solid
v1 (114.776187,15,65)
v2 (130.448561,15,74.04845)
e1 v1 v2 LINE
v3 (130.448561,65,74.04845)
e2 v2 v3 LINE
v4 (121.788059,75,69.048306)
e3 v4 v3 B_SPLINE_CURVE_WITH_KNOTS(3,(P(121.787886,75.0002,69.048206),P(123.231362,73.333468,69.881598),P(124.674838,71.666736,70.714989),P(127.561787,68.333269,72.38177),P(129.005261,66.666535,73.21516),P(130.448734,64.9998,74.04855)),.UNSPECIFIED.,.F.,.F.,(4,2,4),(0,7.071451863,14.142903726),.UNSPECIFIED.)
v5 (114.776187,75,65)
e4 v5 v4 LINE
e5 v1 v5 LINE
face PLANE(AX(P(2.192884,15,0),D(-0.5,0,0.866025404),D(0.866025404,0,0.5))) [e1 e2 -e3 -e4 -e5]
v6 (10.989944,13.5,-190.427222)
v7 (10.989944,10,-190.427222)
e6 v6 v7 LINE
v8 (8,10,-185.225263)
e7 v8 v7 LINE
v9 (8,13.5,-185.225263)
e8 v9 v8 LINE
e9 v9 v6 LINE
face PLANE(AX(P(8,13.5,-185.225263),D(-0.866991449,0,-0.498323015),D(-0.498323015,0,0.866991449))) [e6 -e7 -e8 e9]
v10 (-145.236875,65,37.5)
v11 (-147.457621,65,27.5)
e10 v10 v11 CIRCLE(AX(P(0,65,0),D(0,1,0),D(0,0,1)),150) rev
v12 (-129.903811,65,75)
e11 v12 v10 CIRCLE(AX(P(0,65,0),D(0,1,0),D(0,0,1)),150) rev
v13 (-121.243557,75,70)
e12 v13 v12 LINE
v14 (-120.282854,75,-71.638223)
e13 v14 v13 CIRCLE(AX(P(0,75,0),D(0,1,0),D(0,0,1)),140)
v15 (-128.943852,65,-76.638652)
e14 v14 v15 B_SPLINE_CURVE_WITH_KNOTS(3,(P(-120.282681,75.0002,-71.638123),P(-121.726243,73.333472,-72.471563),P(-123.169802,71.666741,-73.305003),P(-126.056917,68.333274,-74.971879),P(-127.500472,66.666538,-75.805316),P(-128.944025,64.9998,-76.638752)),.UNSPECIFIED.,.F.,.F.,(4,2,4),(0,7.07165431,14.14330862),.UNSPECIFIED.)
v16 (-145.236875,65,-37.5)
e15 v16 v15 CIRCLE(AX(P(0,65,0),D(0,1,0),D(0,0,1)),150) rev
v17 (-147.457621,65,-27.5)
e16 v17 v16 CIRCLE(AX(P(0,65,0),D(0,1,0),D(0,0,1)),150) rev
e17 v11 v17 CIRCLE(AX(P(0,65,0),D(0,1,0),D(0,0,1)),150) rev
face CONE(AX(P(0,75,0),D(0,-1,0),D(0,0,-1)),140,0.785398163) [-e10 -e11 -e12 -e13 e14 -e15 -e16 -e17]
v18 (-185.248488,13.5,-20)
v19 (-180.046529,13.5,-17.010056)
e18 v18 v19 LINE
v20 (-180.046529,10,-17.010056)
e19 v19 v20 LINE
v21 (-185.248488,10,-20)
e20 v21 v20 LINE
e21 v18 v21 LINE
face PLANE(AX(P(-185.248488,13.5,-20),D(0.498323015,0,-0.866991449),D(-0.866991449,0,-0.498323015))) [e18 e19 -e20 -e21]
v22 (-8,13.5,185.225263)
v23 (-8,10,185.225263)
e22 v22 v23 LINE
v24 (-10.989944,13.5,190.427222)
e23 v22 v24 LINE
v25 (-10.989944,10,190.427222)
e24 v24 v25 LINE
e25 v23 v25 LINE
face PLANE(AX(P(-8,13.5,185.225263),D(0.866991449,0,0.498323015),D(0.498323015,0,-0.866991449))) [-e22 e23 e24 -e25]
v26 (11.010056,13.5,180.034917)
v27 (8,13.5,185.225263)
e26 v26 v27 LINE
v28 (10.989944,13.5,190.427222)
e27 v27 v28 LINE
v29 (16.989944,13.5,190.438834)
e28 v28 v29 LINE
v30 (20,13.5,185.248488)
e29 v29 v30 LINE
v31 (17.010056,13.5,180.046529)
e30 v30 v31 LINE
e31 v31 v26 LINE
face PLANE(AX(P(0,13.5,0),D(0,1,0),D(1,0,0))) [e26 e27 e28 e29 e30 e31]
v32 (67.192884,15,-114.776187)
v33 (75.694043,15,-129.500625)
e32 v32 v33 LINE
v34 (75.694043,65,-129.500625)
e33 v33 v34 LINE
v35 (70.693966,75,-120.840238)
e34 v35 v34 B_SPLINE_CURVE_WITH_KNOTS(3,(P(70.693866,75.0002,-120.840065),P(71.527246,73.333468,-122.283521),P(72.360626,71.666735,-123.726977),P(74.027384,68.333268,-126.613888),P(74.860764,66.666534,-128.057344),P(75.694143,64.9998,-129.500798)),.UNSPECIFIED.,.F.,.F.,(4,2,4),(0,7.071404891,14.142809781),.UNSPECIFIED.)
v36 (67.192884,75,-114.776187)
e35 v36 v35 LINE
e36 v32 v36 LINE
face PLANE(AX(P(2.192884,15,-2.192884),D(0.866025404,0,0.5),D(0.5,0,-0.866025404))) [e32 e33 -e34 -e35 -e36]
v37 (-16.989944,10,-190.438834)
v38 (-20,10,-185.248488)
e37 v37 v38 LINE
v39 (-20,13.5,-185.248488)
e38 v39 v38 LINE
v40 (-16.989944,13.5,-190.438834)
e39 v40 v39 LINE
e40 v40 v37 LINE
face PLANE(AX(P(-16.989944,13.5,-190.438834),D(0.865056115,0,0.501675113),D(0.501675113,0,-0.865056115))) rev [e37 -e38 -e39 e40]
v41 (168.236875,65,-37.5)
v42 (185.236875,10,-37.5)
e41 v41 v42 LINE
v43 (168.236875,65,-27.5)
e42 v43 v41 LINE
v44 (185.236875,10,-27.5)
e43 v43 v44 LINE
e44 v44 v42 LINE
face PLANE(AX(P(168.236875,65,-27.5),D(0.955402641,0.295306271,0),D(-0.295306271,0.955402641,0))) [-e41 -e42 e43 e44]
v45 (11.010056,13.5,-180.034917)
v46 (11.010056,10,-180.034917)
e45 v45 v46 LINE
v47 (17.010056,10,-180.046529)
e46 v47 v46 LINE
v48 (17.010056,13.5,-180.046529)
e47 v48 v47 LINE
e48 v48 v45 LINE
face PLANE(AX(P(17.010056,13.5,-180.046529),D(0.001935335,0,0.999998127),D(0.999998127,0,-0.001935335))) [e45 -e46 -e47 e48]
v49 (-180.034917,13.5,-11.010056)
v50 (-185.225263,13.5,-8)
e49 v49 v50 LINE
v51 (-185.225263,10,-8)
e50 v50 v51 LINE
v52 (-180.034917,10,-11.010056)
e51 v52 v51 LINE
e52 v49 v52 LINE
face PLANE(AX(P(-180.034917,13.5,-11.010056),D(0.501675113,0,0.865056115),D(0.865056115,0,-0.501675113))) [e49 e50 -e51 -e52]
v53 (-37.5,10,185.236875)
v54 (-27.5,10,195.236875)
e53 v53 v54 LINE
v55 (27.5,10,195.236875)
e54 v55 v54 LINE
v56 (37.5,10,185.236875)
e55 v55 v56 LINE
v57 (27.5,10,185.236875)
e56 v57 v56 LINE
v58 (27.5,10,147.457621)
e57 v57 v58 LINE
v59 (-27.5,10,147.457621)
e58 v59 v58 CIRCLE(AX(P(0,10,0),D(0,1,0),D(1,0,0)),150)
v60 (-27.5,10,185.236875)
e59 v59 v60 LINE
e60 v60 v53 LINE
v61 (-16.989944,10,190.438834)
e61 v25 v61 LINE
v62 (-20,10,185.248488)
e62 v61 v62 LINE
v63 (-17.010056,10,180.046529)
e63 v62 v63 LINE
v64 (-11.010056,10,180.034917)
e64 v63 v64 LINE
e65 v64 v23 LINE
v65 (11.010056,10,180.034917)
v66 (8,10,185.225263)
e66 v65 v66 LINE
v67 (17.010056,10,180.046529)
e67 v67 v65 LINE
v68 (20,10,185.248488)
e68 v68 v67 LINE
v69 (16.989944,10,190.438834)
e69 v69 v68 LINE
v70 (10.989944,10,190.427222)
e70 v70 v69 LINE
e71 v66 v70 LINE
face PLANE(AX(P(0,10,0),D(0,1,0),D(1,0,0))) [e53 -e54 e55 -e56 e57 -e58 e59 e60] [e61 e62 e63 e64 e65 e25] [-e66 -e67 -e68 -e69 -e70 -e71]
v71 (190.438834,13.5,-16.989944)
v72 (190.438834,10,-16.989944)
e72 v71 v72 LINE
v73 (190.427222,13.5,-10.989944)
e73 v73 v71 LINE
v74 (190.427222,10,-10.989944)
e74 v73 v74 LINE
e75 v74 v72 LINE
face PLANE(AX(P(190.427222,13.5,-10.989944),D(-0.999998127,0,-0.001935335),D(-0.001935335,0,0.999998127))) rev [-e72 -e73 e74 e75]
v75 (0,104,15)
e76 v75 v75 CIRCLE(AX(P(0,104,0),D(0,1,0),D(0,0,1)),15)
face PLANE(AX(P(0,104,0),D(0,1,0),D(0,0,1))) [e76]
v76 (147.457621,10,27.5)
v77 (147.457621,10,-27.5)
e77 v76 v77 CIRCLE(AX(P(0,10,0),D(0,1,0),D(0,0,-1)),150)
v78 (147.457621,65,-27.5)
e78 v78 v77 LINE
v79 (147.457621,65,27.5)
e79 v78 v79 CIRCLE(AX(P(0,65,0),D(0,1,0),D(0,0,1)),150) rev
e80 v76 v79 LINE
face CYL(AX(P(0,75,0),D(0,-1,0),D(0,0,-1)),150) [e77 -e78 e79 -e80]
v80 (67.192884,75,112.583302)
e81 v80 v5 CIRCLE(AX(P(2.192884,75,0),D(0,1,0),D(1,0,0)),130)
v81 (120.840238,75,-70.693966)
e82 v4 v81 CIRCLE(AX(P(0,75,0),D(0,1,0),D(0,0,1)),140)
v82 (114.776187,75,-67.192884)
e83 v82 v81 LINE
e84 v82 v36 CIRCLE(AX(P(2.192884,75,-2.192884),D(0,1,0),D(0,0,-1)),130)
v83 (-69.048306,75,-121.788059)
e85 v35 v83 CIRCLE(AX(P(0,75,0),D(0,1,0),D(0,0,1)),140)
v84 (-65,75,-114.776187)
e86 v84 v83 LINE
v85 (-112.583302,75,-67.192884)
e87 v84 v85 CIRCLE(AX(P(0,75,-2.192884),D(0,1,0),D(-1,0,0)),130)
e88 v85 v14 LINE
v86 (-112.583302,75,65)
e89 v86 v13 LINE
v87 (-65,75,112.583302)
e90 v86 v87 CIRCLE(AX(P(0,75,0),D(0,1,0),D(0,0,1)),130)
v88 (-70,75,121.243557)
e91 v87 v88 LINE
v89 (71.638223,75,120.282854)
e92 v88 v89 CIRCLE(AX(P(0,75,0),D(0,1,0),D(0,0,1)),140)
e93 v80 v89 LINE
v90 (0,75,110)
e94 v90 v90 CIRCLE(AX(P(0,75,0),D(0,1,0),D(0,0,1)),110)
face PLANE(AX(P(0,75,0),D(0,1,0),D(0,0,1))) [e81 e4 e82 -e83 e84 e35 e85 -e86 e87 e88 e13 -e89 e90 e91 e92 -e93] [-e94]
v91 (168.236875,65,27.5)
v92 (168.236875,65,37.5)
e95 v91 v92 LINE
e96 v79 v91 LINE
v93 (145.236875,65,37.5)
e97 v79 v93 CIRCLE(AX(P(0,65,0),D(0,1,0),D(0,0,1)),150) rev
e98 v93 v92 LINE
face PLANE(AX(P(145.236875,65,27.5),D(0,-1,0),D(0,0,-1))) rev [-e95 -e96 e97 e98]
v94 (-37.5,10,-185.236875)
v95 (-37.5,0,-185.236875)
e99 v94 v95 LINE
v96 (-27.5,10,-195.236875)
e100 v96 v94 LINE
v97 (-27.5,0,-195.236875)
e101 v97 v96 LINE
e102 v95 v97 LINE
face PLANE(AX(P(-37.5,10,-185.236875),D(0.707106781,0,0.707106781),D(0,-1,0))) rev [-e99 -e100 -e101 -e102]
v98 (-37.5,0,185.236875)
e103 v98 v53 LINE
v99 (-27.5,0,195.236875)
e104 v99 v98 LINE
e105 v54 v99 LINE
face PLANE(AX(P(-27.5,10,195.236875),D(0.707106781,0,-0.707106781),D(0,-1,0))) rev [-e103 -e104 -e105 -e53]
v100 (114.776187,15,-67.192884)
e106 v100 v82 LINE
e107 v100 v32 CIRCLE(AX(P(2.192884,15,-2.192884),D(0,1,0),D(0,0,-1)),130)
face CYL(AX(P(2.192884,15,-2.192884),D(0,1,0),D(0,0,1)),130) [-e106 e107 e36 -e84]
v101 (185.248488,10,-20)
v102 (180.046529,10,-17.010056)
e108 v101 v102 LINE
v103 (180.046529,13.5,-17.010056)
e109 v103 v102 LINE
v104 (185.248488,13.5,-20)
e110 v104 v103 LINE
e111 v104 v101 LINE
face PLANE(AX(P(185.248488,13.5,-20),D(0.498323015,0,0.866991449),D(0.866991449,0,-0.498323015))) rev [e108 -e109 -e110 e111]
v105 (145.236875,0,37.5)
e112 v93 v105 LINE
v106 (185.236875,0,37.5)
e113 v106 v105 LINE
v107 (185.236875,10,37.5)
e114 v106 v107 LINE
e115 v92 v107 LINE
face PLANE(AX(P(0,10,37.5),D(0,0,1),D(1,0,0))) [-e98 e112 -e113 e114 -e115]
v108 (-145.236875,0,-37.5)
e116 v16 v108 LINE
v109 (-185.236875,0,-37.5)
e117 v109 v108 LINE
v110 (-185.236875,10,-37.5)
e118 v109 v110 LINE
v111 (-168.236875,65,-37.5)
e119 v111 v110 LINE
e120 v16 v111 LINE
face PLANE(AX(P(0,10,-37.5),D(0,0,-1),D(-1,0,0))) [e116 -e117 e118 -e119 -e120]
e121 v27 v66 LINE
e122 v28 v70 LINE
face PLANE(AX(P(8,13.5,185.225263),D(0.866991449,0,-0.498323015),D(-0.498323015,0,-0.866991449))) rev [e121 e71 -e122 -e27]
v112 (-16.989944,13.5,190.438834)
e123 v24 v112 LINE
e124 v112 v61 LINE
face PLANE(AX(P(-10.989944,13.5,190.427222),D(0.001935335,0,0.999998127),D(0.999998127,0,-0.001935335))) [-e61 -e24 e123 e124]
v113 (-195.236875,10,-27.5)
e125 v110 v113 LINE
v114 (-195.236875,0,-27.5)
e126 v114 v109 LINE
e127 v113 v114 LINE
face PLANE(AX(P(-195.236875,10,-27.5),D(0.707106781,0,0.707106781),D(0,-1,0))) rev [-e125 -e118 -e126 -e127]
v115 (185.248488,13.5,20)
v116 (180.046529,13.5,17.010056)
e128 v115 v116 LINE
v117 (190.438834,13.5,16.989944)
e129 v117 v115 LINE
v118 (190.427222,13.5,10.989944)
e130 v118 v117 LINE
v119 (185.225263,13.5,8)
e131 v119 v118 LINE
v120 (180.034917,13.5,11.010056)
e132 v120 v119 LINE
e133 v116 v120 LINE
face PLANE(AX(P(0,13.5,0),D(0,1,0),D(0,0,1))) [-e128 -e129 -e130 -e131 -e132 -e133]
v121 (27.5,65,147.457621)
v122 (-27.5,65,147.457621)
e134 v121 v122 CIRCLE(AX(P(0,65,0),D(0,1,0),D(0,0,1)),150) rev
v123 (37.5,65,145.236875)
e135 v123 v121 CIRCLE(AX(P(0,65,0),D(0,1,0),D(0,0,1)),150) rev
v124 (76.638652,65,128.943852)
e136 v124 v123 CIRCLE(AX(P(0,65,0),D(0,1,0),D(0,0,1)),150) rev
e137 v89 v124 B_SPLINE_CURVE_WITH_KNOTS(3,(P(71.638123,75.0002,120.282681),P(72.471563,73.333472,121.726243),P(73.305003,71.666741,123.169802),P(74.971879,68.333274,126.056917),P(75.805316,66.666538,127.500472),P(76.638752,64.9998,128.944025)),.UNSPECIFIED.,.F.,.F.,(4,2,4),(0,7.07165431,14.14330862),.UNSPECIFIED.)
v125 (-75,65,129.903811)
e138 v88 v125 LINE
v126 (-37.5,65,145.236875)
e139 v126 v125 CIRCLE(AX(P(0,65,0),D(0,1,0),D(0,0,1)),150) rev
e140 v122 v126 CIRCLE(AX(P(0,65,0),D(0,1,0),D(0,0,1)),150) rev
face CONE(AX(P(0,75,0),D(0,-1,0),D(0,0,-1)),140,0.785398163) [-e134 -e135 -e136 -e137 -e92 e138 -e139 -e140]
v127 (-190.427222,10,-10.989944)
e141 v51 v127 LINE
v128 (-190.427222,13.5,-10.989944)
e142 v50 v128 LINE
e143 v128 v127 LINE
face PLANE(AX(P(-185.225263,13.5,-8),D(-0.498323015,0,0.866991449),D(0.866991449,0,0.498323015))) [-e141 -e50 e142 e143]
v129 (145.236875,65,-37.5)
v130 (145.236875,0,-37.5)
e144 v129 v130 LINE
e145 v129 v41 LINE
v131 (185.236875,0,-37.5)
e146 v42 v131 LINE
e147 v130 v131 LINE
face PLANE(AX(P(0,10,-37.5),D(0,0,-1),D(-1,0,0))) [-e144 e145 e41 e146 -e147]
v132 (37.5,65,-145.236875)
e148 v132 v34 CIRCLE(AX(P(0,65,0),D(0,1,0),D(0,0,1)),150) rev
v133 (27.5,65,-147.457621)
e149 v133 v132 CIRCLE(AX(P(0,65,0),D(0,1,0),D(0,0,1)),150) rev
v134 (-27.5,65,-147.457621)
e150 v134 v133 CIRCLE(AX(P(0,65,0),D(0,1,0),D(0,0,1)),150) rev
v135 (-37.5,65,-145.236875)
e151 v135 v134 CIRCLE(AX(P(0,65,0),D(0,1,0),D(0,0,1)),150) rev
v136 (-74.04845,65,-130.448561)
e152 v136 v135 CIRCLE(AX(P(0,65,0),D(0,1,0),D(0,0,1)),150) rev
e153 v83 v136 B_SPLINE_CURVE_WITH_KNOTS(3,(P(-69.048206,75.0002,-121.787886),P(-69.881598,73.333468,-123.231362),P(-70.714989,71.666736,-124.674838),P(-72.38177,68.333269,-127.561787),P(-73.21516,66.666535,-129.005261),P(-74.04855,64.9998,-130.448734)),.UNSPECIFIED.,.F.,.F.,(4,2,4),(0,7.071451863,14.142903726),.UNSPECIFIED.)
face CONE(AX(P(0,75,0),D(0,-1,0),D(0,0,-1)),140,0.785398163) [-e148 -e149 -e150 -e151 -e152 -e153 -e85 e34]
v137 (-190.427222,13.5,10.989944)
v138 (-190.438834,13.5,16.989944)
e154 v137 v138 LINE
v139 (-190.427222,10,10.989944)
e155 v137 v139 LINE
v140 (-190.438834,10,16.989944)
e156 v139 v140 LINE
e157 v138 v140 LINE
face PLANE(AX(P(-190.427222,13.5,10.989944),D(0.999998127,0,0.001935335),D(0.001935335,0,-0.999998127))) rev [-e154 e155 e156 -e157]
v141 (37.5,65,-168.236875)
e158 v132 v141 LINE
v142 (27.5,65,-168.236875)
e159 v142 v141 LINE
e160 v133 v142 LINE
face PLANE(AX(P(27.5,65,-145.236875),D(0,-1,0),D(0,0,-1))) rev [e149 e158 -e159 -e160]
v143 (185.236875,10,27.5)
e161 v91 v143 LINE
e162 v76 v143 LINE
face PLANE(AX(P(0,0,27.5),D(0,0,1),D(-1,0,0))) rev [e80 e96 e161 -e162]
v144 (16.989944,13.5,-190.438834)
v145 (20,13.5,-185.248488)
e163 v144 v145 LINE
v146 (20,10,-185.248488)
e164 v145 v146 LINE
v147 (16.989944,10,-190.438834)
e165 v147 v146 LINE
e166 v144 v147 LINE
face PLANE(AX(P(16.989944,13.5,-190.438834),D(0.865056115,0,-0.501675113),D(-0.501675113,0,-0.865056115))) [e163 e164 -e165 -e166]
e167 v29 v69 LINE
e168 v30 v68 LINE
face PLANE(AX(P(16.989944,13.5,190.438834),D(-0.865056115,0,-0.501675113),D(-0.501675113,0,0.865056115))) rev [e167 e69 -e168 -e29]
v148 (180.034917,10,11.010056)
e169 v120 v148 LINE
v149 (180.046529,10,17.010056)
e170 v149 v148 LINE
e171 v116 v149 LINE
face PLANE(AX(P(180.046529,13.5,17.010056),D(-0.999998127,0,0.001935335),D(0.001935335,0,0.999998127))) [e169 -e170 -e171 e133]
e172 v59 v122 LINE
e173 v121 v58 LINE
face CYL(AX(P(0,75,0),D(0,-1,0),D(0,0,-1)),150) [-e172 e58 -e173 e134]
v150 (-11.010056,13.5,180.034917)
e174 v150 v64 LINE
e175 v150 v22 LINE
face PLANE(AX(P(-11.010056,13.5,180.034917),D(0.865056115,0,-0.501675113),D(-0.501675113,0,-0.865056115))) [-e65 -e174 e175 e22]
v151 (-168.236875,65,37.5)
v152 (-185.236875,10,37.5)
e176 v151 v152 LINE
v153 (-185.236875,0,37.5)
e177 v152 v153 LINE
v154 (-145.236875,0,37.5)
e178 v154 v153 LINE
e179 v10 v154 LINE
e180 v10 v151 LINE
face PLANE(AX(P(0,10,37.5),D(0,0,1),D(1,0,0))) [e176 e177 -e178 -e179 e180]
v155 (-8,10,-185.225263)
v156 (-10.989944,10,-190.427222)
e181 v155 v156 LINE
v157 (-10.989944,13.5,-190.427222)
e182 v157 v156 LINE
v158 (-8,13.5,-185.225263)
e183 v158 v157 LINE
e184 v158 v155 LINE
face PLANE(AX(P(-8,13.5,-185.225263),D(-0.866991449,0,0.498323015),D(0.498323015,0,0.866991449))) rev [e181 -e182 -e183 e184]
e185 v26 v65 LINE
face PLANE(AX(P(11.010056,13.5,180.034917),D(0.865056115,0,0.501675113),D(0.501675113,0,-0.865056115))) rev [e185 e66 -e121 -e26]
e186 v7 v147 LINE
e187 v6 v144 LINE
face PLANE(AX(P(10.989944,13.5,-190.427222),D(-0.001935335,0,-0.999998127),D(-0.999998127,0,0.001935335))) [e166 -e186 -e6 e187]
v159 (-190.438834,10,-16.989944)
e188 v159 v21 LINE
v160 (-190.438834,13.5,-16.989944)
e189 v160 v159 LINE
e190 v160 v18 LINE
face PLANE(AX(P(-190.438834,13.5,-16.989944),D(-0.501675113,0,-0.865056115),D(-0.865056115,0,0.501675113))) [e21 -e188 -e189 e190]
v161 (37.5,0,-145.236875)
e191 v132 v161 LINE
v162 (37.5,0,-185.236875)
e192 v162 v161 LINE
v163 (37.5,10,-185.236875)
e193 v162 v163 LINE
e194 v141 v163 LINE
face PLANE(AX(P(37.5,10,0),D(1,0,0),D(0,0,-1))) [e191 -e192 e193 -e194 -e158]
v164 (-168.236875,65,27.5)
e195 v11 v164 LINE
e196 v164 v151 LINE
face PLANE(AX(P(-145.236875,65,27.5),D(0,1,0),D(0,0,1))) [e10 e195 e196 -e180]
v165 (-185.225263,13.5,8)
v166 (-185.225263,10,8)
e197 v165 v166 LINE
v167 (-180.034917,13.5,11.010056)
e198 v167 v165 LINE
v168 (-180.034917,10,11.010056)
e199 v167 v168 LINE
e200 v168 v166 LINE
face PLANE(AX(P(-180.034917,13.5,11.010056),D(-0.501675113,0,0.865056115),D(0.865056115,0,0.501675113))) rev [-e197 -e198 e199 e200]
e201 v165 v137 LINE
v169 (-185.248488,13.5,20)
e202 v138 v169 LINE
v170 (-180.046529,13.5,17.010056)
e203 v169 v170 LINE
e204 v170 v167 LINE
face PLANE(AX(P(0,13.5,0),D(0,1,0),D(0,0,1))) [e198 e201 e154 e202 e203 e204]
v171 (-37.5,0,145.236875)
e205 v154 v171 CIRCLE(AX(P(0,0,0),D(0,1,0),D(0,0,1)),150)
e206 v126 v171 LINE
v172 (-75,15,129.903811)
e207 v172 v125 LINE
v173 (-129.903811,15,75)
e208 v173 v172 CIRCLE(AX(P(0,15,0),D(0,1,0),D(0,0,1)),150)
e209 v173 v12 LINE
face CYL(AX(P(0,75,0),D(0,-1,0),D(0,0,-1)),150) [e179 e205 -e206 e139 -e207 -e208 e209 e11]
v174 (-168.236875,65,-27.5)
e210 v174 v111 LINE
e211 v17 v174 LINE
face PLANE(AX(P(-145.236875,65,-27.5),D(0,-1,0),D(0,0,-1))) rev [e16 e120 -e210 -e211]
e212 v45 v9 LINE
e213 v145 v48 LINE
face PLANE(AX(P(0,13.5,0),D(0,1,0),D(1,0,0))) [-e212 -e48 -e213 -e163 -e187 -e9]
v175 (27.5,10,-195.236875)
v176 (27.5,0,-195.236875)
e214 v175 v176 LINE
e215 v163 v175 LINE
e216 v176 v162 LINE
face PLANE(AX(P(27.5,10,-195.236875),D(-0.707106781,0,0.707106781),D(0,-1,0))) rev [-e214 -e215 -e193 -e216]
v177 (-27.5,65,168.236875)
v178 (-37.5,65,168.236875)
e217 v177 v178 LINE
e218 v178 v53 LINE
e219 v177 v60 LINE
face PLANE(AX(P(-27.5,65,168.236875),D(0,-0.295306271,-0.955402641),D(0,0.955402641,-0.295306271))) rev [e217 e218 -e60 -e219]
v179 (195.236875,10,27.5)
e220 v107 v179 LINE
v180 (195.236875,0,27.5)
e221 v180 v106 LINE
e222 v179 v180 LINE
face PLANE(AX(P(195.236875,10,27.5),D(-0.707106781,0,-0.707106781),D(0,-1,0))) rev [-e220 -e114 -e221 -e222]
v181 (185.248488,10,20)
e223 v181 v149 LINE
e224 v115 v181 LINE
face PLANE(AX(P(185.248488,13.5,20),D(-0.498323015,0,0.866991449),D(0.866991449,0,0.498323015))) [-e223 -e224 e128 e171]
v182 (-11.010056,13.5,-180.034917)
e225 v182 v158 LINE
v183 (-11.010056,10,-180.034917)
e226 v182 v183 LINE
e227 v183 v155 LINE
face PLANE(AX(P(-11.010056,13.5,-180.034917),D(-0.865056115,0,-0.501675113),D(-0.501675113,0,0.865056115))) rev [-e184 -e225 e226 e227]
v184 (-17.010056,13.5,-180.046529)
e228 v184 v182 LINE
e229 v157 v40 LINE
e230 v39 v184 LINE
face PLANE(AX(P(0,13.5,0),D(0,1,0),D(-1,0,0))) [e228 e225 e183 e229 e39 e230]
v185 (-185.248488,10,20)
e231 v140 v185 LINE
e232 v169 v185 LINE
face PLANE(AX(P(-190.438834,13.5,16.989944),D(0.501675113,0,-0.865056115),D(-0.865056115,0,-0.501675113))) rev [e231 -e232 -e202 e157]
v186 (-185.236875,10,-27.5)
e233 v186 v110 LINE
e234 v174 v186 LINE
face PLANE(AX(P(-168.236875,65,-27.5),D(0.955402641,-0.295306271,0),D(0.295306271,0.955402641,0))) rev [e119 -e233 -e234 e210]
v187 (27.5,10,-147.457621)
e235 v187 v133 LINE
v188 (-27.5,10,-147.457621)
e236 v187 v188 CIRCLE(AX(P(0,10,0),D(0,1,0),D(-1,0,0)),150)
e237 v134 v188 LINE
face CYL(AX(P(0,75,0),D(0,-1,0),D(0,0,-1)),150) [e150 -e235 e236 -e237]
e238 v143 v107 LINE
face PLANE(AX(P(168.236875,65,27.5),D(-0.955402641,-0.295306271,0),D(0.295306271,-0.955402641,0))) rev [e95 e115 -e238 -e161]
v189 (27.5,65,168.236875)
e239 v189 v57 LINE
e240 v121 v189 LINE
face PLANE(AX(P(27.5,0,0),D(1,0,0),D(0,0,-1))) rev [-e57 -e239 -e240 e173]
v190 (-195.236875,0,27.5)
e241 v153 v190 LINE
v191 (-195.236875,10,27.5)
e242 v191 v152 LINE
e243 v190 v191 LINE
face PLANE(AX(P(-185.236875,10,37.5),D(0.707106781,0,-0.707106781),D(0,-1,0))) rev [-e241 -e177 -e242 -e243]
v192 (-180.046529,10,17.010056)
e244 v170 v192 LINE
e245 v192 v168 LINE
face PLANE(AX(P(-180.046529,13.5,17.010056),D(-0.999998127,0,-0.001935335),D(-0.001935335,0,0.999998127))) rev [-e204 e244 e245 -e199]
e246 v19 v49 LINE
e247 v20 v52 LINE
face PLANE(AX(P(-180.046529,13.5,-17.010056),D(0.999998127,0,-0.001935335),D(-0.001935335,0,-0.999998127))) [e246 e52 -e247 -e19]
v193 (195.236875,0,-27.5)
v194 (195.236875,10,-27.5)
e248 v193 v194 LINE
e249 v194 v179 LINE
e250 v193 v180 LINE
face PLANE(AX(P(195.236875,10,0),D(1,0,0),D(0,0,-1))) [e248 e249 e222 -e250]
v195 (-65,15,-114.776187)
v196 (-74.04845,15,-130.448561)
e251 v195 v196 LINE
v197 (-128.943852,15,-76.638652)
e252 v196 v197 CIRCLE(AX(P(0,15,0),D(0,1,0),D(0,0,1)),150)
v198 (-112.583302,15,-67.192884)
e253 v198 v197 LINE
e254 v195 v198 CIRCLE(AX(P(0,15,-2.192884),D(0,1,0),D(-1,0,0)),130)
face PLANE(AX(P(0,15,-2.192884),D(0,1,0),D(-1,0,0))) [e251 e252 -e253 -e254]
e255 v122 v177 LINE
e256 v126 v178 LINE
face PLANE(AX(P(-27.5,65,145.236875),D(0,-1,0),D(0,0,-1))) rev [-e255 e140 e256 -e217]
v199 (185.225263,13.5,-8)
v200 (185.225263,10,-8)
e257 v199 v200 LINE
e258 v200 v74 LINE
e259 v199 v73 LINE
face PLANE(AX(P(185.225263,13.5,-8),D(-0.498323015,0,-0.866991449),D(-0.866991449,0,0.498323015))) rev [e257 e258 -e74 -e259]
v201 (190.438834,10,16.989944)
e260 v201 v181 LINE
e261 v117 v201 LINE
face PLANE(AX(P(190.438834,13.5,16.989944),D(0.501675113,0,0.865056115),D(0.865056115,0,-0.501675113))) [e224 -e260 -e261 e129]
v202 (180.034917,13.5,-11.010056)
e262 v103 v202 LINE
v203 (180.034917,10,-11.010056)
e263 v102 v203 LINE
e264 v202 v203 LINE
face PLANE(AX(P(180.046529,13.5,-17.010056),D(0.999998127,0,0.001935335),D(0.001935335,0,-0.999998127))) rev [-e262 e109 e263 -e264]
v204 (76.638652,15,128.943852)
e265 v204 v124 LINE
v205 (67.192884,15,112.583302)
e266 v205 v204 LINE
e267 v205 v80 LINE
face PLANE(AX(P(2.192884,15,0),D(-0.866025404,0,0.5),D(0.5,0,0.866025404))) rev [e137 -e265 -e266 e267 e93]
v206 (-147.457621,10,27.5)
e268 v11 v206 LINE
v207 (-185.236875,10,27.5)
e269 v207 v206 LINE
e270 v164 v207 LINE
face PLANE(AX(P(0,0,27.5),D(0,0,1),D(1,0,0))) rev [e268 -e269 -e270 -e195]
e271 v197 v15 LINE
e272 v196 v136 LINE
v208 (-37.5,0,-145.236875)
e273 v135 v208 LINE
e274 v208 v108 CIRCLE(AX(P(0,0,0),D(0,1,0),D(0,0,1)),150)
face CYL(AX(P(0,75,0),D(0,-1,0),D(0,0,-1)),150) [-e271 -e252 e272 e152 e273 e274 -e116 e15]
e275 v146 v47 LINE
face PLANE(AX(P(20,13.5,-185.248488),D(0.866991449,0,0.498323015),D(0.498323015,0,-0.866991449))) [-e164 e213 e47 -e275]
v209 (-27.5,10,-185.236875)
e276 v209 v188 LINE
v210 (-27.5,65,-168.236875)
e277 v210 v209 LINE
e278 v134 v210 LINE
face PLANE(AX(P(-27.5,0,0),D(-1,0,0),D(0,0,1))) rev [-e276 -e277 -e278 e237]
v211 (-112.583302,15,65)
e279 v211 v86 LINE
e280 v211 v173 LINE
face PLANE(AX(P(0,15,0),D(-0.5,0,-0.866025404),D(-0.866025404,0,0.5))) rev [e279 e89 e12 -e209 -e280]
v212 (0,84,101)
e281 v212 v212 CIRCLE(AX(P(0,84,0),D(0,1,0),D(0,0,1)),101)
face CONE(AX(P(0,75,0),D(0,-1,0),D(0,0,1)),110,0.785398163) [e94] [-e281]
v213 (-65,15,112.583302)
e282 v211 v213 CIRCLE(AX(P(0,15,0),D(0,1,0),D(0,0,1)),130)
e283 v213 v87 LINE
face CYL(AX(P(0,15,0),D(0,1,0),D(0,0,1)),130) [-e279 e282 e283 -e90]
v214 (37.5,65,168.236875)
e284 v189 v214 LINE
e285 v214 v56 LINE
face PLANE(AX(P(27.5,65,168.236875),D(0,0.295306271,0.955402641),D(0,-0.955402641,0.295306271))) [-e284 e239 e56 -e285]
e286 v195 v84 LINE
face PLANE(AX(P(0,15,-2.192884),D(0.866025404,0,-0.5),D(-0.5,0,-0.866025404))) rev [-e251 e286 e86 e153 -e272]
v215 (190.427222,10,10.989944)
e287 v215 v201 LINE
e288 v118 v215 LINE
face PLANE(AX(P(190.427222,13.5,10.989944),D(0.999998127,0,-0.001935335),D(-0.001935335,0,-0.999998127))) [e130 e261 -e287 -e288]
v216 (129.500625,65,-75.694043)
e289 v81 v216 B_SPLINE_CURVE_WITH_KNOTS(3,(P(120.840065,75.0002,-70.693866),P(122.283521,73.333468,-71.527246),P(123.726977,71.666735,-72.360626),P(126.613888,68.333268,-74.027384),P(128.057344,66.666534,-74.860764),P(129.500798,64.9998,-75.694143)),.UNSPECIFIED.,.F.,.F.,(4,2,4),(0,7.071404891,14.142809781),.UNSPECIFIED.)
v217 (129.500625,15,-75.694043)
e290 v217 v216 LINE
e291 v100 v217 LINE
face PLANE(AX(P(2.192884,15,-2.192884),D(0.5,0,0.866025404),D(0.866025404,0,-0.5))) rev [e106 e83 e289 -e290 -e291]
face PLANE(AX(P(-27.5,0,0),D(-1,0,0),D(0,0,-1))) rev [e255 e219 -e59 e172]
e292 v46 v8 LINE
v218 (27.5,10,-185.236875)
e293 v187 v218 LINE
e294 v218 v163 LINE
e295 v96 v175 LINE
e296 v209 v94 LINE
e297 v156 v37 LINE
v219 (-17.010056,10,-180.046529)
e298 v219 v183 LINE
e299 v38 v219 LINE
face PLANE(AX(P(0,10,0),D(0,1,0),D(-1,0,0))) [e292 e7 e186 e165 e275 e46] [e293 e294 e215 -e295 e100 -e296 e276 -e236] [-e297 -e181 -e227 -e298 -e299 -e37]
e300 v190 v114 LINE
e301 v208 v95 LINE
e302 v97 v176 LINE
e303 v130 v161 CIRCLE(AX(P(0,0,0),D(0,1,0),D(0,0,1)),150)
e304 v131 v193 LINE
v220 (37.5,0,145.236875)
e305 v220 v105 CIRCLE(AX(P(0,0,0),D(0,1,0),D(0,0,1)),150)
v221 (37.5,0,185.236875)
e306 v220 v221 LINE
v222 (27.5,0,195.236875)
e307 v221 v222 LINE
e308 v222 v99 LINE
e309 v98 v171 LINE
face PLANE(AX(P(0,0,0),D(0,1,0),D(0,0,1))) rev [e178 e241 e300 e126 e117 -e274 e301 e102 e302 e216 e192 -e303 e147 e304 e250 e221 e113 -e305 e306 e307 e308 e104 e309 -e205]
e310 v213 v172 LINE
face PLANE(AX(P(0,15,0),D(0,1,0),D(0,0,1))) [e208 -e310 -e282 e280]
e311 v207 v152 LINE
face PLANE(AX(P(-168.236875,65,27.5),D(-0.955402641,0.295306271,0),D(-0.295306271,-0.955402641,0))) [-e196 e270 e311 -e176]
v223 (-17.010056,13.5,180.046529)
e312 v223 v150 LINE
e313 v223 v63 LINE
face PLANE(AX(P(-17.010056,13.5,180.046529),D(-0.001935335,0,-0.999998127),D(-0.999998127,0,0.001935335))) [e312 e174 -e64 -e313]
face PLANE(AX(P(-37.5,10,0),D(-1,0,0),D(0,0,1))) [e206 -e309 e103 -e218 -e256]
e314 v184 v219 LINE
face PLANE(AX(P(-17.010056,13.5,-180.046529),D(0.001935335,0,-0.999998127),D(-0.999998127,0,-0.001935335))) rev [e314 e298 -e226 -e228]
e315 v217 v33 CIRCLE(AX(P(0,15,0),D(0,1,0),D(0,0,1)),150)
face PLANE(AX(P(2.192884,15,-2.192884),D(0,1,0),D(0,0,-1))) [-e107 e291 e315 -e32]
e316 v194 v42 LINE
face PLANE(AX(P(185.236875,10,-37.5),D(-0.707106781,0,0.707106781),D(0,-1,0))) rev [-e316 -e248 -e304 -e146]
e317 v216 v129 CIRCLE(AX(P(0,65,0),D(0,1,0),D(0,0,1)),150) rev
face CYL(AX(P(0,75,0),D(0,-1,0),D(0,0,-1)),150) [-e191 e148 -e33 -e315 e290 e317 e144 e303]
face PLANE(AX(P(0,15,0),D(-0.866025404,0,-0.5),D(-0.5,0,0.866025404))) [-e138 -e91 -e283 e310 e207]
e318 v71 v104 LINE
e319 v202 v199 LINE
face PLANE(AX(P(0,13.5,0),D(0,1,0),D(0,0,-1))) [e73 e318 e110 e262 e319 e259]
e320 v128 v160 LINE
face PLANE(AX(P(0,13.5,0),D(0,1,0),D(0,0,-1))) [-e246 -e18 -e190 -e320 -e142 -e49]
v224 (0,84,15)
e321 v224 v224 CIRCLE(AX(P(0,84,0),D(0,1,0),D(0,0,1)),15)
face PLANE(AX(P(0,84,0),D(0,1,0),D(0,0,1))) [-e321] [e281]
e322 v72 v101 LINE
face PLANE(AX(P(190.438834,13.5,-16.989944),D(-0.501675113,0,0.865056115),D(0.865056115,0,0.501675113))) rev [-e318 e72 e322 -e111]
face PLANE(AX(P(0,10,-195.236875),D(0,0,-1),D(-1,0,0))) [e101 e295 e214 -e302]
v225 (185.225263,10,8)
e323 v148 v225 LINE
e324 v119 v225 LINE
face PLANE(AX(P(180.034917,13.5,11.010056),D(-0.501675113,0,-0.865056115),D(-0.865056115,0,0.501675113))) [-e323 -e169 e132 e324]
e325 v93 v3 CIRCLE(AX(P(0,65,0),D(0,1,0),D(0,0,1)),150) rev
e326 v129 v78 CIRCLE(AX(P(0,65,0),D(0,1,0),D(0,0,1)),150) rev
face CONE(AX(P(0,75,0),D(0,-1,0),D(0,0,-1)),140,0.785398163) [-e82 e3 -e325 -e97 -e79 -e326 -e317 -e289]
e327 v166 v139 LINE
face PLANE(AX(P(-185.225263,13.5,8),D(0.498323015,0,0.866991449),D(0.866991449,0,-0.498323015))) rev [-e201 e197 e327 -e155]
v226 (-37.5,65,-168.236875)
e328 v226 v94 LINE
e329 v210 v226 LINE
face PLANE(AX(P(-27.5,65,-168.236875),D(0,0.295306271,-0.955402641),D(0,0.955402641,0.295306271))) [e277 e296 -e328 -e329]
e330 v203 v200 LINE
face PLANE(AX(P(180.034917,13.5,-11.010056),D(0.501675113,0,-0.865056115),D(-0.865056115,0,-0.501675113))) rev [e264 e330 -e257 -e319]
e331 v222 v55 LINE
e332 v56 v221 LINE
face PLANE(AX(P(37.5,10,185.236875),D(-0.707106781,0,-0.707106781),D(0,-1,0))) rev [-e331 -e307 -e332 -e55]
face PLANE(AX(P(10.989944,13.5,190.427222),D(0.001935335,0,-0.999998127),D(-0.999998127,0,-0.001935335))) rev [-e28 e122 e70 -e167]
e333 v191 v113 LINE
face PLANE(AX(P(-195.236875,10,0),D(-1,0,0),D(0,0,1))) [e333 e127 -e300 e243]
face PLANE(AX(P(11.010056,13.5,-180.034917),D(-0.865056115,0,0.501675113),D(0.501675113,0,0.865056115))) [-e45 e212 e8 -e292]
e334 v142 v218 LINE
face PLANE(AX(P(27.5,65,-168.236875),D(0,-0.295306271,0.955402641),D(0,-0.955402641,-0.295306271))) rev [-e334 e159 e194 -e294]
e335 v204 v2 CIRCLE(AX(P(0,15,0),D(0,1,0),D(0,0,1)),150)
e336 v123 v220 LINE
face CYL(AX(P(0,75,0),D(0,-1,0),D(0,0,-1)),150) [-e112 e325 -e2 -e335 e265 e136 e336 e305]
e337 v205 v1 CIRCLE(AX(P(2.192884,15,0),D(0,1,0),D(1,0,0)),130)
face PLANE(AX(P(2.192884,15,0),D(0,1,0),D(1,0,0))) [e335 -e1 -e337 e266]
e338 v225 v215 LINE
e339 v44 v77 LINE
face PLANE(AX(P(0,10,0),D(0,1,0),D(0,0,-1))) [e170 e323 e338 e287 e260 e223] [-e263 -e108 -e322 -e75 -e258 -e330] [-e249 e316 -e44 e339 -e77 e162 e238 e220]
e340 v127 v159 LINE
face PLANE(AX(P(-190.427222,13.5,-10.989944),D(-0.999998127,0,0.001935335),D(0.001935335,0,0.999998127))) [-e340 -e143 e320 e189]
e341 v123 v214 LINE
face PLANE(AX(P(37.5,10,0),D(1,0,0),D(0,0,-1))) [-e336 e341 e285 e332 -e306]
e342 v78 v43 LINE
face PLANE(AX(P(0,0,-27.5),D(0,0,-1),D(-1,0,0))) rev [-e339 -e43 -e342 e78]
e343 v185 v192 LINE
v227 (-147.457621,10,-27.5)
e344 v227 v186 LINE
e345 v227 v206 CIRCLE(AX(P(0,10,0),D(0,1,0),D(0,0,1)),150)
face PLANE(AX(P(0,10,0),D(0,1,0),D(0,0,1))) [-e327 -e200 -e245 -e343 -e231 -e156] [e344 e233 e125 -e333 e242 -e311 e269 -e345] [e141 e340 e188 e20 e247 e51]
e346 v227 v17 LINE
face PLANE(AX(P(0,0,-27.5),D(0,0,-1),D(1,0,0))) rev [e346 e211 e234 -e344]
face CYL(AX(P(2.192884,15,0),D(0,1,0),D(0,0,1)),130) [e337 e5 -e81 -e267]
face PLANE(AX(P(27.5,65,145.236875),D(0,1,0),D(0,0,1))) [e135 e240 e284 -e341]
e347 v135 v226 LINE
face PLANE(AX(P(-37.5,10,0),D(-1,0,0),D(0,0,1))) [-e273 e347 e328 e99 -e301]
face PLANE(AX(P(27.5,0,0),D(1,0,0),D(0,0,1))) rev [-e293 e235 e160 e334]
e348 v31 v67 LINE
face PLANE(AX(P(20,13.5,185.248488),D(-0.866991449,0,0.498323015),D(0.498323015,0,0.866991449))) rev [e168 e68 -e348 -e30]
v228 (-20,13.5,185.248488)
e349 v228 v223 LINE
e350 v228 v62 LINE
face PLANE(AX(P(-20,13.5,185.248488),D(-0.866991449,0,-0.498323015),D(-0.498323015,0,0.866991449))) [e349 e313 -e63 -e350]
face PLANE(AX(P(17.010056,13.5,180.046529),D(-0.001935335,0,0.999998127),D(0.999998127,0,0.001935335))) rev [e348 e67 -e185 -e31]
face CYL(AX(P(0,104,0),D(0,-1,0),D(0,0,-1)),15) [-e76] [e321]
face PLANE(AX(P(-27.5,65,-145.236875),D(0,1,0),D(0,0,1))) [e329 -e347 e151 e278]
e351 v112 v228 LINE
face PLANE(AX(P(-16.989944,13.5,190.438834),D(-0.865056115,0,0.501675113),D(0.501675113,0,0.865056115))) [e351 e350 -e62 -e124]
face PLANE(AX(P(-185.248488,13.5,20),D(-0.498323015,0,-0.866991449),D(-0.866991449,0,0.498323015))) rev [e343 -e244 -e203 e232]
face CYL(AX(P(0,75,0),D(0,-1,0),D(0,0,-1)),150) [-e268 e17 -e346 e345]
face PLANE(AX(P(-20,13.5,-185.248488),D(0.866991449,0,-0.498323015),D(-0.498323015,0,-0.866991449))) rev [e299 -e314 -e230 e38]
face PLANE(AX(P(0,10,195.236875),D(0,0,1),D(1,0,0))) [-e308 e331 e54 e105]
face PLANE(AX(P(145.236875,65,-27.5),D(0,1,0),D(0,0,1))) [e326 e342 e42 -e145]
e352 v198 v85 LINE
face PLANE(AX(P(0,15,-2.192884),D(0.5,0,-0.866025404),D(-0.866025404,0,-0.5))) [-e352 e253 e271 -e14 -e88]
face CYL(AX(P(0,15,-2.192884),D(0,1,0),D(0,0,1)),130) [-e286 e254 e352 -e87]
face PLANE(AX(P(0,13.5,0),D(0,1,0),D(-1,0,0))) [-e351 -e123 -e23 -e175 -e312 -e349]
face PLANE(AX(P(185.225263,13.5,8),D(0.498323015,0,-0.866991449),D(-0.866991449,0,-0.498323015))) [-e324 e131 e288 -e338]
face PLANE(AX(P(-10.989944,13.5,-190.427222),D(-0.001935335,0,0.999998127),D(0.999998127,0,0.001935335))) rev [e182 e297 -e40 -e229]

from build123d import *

# Parameters (mm, degrees)
SKETCH1_R                    = 150
BOSS_EXTRUDE1_DEPTH          = 75
CHAMFER1_SIZE                = 10
BOSS_EXTRUDE2_START          = -75
BOSS_EXTRUDE2_DEPTH          = 10
CHAMFER2_SIZE                = 10
BOSS_EXTRUDE3_DEPTH          = 10
BOSS_EXTRUDE4_DEPTH          = 3.5
CIRPATTERN1_COUNT            = 4
CIRPATTERN1_COPY_1_DEPTH     = 10
CIRPATTERN1_COPY_2_DEPTH     = 10
CIRPATTERN1_COPY_3_DEPTH     = 10
CIRPATTERN1_COPY_4_DEPTH     = 3.5
CIRPATTERN1_COPY_5_DEPTH     = 3.5
CIRPATTERN1_COPY_6_DEPTH     = 3.5
CHAMFER2_OF_CIRPATTERN1_SIZE = 10
CUT_EXTRUDE1_START           = -60
CUT_EXTRUDE1_DEPTH           = 60
CIRPATTERN3_COUNT            = 4
SKETCH15_R                   = 110
BOSS_EXTRUDE6_DEPTH          = 9
BOSS_EXTRUDE6_TAPER          = 45
SKETCH16_R                   = 15
BOSS_EXTRUDE7_DEPTH          = 20


# Read off the part's stored shape, not the designer's step: Cut-Extrude1
with BuildPart() as part:
    # Sketch1 → Boss-Extrude1 (new body)
    with BuildSketch(Plane(origin=(0, 0, 0), x_dir=(1, 0, 0), z_dir=(0, 1, 0))):
        with Locations(Location((0, 0, 0), (0, 0, 270))):
            Circle(SKETCH1_R)
    extrude(amount=BOSS_EXTRUDE1_DEPTH)

    # Chamfer1
    chamfer1_edges = [part.edges().sort_by_distance(p)[0] for p in [
        (0, 75, -150),
    ]]
    chamfer(chamfer1_edges, length=CHAMFER1_SIZE)

    # Sketch2 → Boss-Extrude2 (add)
    with BuildSketch(Plane(origin=(0, 75, 0), x_dir=(1, 0, 0), z_dir=(0, 1, 0)).offset(BOSS_EXTRUDE2_START)):
        with BuildLine():
            ThreePointArc((-145.236875483, -37.5), (-148.80445444, -18.900643872), (-150, 0))
            Line((-150, 0), (-195.236875483, 0))
            Line((-195.236875483, 0), (-195.236875483, -37.5))
            Line((-195.236875483, -37.5), (-145.236875483, -37.5))
        make_face()
        with BuildLine():
            Line((-195.236875483, 0), (-150, 0))
            ThreePointArc((-150, 0), (-148.80445444, 18.900643872), (-145.236875483, 37.5))
            Line((-145.236875483, 37.5), (-195.236875483, 37.5))
            Line((-195.236875483, 37.5), (-195.236875483, 0))
        make_face()
    boss_extrude2 = extrude(amount=BOSS_EXTRUDE2_DEPTH)

    # Chamfer2
    chamfer2_edges = [part.edges().sort_by_distance(p)[0] for p in [
        (-195.236875483, 5, -37.5),
        (-195.236875483, 5, 37.5),
    ]]
    chamfer(chamfer2_edges, length=CHAMFER2_SIZE)

    # Sketch5 → Boss-Extrude3 (add)
    with BuildSketch(Plane.XY.offset(37.5)):
        Polygon((-145.236875483, 10), (-145.236875483, 65), (-168.236875483, 65), (-185.236875483, 10), align=None)
    boss_extrude3 = extrude(amount=-BOSS_EXTRUDE3_DEPTH)

    # Sketch7 → Boss-Extrude4 (add)
    with BuildSketch(Plane(origin=(0, 10, 0), x_dir=(1, 0, 0), z_dir=(0, 1, 0))):
        Polygon((-180.034917045, -11.010056312), (-185.225263454, -8), (-190.427221891, -10.989943688), (-190.43883392, -16.989943688), (-185.248487512, -20), (-180.046529075, -17.010056312), align=None)
    boss_extrude4 = extrude(amount=BOSS_EXTRUDE4_DEPTH)

    # Mirror2: Boss-Extrude3, Boss-Extrude4 across plane
    add(boss_extrude3.mirror(Plane.XY))
    add(boss_extrude4.mirror(Plane.XY))

    # CirPattern1: Boss-Extrude2, Boss-Extrude3, Boss-Extrude4 ×4 about axis
    cirpattern1_axis = Axis((0, 0, 0), (0, 1, 0))
    add([boss_extrude2.rotate(cirpattern1_axis, i * 360 / CIRPATTERN1_COUNT) for i in range(1, CIRPATTERN1_COUNT)])
    add([boss_extrude3.rotate(cirpattern1_axis, i * 360 / CIRPATTERN1_COUNT) for i in range(1, CIRPATTERN1_COUNT)])
    add([boss_extrude4.rotate(cirpattern1_axis, i * 360 / CIRPATTERN1_COUNT) for i in range(1, CIRPATTERN1_COUNT)])

    # CirPattern1 copy 1 sketch → CirPattern1 copy 1 (add)
    with BuildSketch(Plane(origin=(-37.5, 0, 0), x_dir=(0, 0, -1), z_dir=(-1, 0, 0))):
        Polygon((-145.236875483, -10), (-145.236875483, -65), (-168.236875483, -65), (-185.236875483, -10), align=None)
    extrude(amount=-CIRPATTERN1_COPY_1_DEPTH)

    # CirPattern1 copy 2 sketch → CirPattern1 copy 2 (add)
    with BuildSketch(Plane(origin=(0, 0, 37.5), x_dir=(-1, 0, 0), z_dir=(0, 0, 1))):
        Polygon((-145.236875483, -10), (-145.236875483, -65), (-168.236875483, -65), (-185.236875483, -10), align=None)
    extrude(amount=-CIRPATTERN1_COPY_2_DEPTH)

    # CirPattern1 copy 3 sketch → CirPattern1 copy 3 (add)
    with BuildSketch(Plane(origin=(37.5, 0, 0), x_dir=(0, 0, 1), z_dir=(1, 0, 0))):
        Polygon((-145.236875483, -10), (-145.236875483, -65), (-168.236875483, -65), (-185.236875483, -10), align=None)
    extrude(amount=-CIRPATTERN1_COPY_3_DEPTH)

    # CirPattern1 copy 4 sketch → CirPattern1 copy 4 (add)
    with BuildSketch(Plane(origin=(0, 10, 0), x_dir=(0, 0, -1), z_dir=(0, 1, 0))):
        Polygon((-180.034917045, 11.010056312), (-185.225263454, 8), (-190.427221891, 10.989943688), (-190.43883392, 16.989943688), (-185.248487512, 20), (-180.046529075, 17.010056312), align=None)
    extrude(amount=CIRPATTERN1_COPY_4_DEPTH)

    # CirPattern1 copy 5 sketch → CirPattern1 copy 5 (add)
    with BuildSketch(Plane(origin=(0, 10, 0), x_dir=(-1, 0, 0), z_dir=(0, 1, 0))):
        Polygon((-180.034917045, 11.010056312), (-185.225263454, 8), (-190.427221891, 10.989943688), (-190.43883392, 16.989943688), (-185.248487512, 20), (-180.046529075, 17.010056312), align=None)
    extrude(amount=CIRPATTERN1_COPY_5_DEPTH)

    # CirPattern1 copy 6 sketch → CirPattern1 copy 6 (add)
    with BuildSketch(Plane.ZX.offset(10)):
        Polygon((-180.034917045, 11.010056312), (-185.225263454, 8), (-190.427221891, 10.989943688), (-190.43883392, 16.989943688), (-185.248487512, 20), (-180.046529075, 17.010056312), align=None)
    extrude(amount=CIRPATTERN1_COPY_6_DEPTH)

    # Chamfer2 of CirPattern1
    chamfer2_of_cirpattern1_edges = [part.edges().sort_by_distance(p)[0] for p in [
        (-37.5, 5, 195.236875483),
        (37.5, 5, 195.236875483),
        (195.236875483, 5, 37.5),
        (195.236875483, 5, -37.5),
        (37.5, 5, -195.236875483),
        (-37.5, 5, -195.236875483),
    ]]
    chamfer(chamfer2_of_cirpattern1_edges, length=CHAMFER2_OF_CIRPATTERN1_SIZE)

    # Cut-Extrude1 outline → Cut-Extrude1 (cut)
    with BuildSketch(Plane(origin=(0, 75, 0), x_dir=(1, 0, 0), z_dir=(0, 1, 0)).offset(CUT_EXTRUDE1_START)):
        with BuildLine():
            ThreePointArc((-65, -112.583302492), (-91.923881554, -91.923881554), (-112.583302492, -65))
            Line((-112.583302492, -65), (-129.903810568, -75))
            ThreePointArc((-129.903810568, -75), (-106.066017178, -106.066017178), (-75, -129.903810568))
            Line((-75, -129.903810568), (-65, -112.583302492))
        make_face()
    cut_extrude1 = extrude(amount=CUT_EXTRUDE1_DEPTH, mode=Mode.SUBTRACT)

    # CirPattern3: Cut-Extrude1 ×4 about axis
    cirpattern3_axis = Axis((1.096442134, 0, -1.096442134), (0, 1, 0))
    for i in range(1, CIRPATTERN3_COUNT):
        add(cut_extrude1.rotate(cirpattern3_axis, i * 360 / CIRPATTERN3_COUNT), mode=Mode.SUBTRACT)

    # Sketch15 → Boss-Extrude6 (add)
    with BuildSketch(Plane(origin=(0, 75, 0), x_dir=(1, 0, 0), z_dir=(0, 1, 0))):
        Circle(SKETCH15_R)
    extrude(amount=BOSS_EXTRUDE6_DEPTH, taper=BOSS_EXTRUDE6_TAPER)

    # Sketch16 → Boss-Extrude7 (add)
    with BuildSketch(Plane(origin=(0, 84, 0), x_dir=(1, 0, 0), z_dir=(0, 1, 0))):
        with Locations(Location((0, 0, 0), (0, 0, 270))):
            Circle(SKETCH16_R)
    extrude(amount=BOSS_EXTRUDE7_DEPTH)


solid = part.part
